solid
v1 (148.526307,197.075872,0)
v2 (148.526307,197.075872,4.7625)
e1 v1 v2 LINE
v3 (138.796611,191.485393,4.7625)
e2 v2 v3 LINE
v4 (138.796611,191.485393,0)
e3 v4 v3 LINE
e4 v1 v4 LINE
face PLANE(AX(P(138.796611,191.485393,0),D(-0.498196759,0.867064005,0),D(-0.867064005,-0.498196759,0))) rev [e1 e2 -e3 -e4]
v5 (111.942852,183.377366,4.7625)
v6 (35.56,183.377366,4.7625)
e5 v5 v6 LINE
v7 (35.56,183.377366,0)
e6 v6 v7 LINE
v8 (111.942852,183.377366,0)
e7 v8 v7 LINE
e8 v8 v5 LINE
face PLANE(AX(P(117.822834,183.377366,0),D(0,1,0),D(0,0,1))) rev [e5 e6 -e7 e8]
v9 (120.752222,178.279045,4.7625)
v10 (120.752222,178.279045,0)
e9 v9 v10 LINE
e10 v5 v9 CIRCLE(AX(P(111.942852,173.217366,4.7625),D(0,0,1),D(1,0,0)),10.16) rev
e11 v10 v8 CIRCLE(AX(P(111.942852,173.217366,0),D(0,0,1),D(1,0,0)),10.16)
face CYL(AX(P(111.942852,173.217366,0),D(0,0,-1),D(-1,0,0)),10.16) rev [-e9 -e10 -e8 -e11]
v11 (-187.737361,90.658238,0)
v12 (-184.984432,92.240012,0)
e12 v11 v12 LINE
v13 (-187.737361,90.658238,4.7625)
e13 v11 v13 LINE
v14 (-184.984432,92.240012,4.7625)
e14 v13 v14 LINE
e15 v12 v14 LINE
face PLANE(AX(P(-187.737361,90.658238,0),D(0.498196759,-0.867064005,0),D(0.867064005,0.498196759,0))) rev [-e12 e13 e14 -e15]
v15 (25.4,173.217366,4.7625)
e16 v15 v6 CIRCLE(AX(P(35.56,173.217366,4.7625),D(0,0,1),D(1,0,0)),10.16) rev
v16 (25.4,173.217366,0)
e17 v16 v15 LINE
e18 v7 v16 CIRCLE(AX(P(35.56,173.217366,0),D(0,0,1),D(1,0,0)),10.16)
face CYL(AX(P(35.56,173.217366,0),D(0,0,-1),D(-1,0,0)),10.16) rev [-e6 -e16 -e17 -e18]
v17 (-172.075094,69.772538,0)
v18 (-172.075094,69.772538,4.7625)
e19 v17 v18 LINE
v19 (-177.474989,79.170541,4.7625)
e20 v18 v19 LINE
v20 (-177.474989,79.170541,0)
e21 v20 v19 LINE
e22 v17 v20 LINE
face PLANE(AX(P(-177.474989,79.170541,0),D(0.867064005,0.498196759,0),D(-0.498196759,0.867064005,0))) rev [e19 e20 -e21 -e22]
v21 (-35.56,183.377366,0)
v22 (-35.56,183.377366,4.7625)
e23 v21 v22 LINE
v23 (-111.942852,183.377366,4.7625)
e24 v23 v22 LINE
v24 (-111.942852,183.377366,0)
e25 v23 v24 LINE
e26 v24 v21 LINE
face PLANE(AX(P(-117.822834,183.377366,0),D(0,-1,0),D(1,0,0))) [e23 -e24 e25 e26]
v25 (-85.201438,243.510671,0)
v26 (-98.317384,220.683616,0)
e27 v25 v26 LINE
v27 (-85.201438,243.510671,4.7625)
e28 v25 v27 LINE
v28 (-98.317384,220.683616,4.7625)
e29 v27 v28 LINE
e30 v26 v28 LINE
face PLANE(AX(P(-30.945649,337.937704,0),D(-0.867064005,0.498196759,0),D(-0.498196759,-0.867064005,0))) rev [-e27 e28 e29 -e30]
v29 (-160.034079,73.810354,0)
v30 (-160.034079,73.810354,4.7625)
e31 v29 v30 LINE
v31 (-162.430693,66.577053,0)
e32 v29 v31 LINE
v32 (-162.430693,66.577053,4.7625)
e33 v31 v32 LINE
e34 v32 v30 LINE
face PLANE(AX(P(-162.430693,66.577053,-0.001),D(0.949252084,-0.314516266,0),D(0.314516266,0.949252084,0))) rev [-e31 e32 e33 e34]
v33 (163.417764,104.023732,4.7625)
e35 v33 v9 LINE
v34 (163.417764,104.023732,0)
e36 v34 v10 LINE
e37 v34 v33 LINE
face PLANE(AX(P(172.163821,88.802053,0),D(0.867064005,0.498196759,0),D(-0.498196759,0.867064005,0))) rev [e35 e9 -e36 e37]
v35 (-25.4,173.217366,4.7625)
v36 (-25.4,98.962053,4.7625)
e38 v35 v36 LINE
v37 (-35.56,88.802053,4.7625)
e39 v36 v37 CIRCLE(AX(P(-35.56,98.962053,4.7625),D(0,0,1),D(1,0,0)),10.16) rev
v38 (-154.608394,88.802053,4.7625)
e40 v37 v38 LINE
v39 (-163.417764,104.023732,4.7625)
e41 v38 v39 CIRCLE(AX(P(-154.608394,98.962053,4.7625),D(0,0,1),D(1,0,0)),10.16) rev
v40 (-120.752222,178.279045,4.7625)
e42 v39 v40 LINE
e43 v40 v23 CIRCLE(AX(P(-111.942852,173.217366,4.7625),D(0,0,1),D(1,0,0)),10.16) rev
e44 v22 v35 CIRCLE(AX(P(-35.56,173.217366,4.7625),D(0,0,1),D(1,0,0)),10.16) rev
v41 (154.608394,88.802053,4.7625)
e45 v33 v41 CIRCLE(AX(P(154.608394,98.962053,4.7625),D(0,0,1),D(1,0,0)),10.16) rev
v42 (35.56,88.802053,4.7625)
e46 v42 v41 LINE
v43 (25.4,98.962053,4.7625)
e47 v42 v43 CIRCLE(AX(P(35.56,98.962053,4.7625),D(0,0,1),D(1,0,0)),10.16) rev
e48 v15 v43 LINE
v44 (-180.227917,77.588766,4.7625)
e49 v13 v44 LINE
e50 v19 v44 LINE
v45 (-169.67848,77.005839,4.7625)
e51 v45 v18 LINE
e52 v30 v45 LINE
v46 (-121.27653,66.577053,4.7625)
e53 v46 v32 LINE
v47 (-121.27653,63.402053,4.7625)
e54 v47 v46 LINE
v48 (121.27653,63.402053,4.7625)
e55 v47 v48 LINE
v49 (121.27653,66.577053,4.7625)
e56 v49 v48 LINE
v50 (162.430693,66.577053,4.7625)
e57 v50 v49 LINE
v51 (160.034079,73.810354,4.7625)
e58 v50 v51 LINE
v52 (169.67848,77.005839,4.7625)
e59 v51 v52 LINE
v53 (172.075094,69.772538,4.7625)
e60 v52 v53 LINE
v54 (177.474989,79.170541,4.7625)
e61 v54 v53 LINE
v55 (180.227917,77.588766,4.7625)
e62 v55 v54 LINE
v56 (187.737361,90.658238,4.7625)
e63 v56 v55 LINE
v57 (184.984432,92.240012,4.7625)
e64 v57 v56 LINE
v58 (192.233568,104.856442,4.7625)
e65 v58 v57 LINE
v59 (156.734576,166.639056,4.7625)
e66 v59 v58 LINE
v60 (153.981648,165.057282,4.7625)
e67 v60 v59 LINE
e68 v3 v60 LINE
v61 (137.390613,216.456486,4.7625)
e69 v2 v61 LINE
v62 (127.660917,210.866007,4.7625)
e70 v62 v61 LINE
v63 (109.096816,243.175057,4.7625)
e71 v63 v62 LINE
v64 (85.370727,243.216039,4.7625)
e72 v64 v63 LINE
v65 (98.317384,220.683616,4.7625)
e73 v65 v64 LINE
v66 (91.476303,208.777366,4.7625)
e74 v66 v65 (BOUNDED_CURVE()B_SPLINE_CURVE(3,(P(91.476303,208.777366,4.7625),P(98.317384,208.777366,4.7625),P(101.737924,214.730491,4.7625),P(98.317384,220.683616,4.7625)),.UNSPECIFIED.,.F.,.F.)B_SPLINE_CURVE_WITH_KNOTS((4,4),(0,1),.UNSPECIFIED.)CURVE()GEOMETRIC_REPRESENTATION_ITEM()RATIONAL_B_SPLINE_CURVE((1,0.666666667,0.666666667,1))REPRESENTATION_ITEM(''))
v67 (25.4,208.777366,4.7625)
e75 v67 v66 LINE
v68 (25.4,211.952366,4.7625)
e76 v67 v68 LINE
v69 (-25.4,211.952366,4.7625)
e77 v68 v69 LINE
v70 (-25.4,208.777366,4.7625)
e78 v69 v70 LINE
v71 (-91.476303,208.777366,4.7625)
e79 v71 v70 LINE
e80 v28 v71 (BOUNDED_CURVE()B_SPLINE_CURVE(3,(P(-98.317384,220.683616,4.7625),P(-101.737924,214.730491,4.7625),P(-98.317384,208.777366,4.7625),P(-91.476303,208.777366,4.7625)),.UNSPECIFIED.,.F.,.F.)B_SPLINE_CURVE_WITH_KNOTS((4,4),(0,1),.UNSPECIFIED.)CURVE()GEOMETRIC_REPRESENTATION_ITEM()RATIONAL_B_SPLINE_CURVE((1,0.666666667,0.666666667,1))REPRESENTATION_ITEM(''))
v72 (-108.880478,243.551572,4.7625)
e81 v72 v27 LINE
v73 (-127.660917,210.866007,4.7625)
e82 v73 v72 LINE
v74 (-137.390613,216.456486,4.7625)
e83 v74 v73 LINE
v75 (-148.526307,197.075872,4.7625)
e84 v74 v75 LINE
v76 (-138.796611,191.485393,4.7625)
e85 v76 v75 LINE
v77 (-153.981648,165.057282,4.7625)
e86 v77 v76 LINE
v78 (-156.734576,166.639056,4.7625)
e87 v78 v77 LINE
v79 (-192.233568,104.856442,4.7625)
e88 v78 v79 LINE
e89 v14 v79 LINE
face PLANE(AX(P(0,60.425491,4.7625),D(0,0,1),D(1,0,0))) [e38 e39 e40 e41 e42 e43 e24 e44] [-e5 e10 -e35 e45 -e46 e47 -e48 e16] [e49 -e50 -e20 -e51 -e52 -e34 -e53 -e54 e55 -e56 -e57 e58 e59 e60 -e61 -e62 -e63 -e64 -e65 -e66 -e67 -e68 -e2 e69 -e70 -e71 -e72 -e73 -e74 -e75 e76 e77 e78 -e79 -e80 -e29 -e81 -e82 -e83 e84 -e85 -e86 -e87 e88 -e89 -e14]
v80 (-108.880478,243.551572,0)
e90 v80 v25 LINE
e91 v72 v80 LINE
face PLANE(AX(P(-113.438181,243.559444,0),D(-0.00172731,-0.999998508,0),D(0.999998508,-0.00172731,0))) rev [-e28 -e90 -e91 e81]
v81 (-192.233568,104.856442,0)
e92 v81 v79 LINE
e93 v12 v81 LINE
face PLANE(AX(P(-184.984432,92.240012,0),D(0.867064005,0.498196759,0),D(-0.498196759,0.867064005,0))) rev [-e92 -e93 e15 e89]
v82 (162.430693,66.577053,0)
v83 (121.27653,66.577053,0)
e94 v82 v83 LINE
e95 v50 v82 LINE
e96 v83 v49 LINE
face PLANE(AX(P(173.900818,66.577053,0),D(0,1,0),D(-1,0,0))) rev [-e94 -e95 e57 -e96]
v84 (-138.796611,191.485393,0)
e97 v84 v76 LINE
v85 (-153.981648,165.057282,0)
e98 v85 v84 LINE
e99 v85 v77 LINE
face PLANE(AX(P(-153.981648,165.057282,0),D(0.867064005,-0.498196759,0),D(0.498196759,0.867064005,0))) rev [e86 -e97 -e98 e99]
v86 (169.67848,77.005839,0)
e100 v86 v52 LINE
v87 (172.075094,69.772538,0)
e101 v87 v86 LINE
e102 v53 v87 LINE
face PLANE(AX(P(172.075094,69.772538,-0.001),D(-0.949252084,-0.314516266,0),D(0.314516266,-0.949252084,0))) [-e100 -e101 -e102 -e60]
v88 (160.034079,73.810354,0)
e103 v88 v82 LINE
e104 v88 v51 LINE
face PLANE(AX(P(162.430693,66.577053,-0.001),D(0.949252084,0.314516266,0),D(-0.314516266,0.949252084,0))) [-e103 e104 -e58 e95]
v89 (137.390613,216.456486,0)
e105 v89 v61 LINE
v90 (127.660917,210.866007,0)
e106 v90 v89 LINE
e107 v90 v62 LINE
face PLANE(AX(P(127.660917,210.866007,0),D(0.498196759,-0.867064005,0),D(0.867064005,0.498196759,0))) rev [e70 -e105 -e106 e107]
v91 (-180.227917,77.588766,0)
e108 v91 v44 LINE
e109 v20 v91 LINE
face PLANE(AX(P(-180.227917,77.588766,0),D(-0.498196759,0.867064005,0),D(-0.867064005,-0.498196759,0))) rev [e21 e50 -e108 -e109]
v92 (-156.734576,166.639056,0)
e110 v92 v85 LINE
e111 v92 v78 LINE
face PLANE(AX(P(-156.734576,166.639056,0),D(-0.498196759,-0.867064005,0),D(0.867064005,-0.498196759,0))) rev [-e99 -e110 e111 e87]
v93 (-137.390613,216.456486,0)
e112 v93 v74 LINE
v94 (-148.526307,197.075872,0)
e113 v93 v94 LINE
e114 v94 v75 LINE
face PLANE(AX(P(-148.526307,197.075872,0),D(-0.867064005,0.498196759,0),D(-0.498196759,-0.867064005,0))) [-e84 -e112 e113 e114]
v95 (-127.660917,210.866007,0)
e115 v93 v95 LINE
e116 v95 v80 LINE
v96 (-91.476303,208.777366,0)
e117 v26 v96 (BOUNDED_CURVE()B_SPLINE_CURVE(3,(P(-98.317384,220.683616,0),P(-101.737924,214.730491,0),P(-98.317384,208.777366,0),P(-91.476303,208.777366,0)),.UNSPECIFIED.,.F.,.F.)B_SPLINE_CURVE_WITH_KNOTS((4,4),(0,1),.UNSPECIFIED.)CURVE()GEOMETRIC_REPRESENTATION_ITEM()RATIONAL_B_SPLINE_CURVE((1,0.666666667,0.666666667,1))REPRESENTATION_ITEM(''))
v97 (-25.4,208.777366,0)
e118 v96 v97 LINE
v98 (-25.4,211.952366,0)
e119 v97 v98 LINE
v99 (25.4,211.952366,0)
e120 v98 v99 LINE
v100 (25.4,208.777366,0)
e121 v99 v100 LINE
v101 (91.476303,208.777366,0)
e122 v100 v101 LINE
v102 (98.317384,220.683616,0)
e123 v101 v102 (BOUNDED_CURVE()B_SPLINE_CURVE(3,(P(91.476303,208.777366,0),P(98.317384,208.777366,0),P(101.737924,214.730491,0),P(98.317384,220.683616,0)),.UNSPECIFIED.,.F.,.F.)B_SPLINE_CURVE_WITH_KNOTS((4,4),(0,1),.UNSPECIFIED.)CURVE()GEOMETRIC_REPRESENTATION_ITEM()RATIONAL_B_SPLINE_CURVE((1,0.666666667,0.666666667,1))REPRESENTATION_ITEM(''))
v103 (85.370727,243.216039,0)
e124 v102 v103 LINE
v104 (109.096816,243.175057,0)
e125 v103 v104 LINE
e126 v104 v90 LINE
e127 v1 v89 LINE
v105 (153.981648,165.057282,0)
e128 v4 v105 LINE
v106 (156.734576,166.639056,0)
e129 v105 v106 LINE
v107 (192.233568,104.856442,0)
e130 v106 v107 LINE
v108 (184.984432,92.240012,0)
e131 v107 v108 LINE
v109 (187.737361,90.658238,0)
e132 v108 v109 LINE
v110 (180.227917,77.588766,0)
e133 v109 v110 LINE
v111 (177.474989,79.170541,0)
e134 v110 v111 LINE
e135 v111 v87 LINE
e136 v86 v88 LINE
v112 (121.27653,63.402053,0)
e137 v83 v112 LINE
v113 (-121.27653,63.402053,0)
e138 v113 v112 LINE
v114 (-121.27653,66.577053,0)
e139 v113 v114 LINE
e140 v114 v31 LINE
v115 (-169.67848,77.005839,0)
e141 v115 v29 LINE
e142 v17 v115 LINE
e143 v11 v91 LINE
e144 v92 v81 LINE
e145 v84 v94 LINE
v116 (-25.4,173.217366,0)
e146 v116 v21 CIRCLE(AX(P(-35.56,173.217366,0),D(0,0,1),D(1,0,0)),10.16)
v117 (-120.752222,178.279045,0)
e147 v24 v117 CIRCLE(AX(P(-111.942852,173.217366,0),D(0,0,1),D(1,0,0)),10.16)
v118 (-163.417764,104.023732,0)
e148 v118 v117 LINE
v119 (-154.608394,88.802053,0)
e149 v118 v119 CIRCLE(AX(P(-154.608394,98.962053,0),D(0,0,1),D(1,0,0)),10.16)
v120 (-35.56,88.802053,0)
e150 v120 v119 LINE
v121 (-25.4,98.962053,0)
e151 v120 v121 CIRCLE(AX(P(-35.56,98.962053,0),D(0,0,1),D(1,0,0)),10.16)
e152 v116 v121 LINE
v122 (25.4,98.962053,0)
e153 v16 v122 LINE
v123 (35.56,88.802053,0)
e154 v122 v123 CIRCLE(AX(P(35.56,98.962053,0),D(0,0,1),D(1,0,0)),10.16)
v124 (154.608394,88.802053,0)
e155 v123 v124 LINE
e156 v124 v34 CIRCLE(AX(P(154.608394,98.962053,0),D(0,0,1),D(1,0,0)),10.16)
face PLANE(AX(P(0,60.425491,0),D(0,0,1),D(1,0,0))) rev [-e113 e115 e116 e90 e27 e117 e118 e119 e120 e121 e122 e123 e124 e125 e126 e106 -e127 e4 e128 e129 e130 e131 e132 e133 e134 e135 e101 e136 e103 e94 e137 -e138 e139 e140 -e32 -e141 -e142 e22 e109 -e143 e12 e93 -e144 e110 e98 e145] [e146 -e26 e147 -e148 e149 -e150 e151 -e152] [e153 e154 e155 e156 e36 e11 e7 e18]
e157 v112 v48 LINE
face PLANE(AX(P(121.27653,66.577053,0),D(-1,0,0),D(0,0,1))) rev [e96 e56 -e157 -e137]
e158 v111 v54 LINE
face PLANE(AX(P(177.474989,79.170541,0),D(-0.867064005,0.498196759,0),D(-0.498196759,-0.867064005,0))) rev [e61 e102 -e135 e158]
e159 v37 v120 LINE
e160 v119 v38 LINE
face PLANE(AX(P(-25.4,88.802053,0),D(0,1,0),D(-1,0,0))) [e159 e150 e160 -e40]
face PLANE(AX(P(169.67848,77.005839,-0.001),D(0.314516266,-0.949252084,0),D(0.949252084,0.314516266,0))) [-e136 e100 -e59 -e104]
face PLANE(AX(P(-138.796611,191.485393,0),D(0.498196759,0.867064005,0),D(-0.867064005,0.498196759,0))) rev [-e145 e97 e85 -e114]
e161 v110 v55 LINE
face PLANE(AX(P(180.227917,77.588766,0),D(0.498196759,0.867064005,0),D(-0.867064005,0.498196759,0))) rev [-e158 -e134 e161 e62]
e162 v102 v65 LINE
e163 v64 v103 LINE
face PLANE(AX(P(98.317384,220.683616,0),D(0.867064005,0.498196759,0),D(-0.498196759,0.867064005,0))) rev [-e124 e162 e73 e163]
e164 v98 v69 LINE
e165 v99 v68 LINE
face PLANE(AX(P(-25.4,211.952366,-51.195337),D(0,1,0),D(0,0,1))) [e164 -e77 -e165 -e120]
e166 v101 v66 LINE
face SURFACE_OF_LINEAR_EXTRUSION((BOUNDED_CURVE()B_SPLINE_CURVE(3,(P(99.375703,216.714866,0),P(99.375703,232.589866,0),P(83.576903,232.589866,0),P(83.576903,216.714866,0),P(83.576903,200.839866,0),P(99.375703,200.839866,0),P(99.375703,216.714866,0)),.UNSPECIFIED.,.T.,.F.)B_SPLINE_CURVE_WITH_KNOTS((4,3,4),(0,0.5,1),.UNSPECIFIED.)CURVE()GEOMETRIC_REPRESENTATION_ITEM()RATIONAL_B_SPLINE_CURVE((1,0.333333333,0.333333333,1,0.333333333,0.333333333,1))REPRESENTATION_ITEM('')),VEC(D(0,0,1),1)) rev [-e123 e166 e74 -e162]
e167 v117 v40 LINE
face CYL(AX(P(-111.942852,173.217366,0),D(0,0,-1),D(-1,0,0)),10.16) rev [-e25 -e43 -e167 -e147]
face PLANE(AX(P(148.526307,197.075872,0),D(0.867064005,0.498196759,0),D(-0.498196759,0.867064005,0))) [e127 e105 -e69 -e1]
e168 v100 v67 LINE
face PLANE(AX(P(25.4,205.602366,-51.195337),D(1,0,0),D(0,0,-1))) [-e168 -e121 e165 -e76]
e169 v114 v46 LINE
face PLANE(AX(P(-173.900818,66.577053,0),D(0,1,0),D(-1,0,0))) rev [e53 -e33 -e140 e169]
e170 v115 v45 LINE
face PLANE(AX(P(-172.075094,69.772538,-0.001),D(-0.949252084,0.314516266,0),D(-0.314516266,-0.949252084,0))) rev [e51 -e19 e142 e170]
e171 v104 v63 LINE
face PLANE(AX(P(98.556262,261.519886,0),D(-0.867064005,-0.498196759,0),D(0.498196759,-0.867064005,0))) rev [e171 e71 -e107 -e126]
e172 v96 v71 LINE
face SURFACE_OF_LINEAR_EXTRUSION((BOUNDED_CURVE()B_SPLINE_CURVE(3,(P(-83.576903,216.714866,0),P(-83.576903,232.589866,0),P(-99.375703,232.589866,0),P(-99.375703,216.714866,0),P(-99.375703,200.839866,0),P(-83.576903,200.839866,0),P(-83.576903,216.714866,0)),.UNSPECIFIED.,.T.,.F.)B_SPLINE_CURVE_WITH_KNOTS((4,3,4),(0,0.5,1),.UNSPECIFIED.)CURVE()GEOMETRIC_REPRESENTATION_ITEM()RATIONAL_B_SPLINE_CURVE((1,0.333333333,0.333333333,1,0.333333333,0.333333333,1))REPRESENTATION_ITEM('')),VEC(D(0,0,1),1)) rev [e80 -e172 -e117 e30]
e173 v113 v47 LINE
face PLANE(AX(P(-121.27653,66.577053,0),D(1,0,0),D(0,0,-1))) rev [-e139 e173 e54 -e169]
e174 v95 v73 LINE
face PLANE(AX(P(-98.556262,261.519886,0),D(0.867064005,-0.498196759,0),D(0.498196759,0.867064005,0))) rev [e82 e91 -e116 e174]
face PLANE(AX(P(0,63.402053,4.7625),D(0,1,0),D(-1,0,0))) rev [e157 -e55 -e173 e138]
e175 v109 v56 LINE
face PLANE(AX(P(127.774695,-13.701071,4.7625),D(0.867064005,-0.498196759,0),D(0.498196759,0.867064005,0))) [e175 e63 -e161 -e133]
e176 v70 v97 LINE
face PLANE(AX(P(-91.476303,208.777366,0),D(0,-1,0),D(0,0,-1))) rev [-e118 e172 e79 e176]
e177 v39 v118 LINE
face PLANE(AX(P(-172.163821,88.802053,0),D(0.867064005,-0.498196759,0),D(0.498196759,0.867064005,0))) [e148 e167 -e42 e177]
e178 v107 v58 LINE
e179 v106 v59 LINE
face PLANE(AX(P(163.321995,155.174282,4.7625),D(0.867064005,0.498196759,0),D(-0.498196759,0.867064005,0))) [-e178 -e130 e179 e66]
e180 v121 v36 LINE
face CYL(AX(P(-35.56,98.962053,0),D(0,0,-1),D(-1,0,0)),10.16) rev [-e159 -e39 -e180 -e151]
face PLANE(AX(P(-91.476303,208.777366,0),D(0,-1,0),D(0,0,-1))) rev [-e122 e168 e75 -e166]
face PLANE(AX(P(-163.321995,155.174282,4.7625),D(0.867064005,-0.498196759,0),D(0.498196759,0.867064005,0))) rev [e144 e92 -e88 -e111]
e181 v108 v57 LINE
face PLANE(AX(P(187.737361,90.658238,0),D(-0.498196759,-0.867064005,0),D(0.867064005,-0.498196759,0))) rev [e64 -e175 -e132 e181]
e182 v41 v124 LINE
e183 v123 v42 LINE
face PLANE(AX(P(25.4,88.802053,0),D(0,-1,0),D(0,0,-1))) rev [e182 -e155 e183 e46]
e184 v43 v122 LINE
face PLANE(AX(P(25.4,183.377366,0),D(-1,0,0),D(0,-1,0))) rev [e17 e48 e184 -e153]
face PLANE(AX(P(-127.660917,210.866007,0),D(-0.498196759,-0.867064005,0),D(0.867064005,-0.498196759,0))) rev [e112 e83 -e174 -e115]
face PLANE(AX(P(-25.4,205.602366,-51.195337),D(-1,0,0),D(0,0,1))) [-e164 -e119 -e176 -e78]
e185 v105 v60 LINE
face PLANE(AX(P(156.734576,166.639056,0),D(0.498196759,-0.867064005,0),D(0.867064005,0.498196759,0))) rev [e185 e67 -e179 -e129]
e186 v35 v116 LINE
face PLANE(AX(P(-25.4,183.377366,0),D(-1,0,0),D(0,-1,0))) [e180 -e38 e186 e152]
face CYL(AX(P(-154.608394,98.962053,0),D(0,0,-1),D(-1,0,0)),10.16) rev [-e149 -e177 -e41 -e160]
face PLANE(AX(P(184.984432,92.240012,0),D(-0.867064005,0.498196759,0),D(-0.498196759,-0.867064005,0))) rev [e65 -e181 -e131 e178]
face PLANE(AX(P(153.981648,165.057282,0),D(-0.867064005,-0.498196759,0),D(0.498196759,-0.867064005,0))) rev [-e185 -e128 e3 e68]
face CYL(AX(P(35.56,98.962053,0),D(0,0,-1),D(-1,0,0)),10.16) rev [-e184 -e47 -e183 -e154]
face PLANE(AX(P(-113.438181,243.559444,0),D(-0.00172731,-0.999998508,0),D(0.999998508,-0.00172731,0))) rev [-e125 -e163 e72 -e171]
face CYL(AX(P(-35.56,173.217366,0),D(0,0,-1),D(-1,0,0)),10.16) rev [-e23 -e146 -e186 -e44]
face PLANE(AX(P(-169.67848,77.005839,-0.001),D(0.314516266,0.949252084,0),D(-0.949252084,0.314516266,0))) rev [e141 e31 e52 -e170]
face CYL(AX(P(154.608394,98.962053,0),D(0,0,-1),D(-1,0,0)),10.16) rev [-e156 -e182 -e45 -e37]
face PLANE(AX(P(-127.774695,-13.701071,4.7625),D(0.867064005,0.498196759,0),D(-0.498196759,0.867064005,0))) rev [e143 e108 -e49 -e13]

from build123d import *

# Parameters (mm, degrees)
BOSS_EXTRUDE1_DEPTH = 4.7625
CUT_EXTRUDE5_DEPTH  = 591.371112999
SCALE1_SCALE_X      = 0.622
SCALE1_SCALE_Y      = 0.625
SCALE1_SCALE_Z      = 1
CUT_EXTRUDE8_DEPTH  = 422.073439333
FILLET1_R           = 10.16
CUT_EXTRUDE9_DEPTH  = 422.073439333
BOSS_EXTRUDE2_DEPTH = 4.7625
CUT_EXTRUDE10_DEPTH = 422.073439333
CUT_EXTRUDE11_DEPTH = 422.073439333
SKETCH16_W          = 50.8
SKETCH16_H          = 6.35
BOSS_EXTRUDE3_DEPTH = 4.7625
CUT_EXTRUDE12_START = -4.7625
CUT_EXTRUDE12_DEPTH = 4.7625
CUT_EXTRUDE13_DEPTH = 421.232758824


# Read off the part's stored shape, not the designer's step: Cut-Extrude12
with BuildPart() as part:
    # Sketch3 → Boss-Extrude1 (new body)
    with BuildSketch(Plane.XY):
        Polygon((312.000738686, 65.991135768), (166.792028218, 317.5), (-166.792028218, 317.5), (-312.000738686, 65.991135768), (-276.650369343, 4.7625), (276.650369343, 4.7625), align=None)
        Polygon((-166.792028218, 317.5), (166.792028218, 317.5), (60.750369343, 501.169540891), (-60.750369343, 501.169540891), align=None)
    extrude(amount=BOSS_EXTRUDE1_DEPTH)

    # Sketch7 → Cut-Extrude5 (cut, through all)
    with BuildSketch(Plane.XY.offset(4.7625)):
        with BuildLine():
            Line((-147.068010972, 237.363), (147.068010972, 237.363))
            ThreePointArc((147.068010972, 237.363), (158.0665336, 243.713), (158.0665336, 256.413))
            Line((158.0665336, 256.413), (49.751846715, 444.019540891))
            ThreePointArc((49.751846715, 444.019540891), (45.103324087, 448.668063519), (38.753324087, 450.369540891))
            Line((38.753324087, 450.369540891), (-38.753324087, 450.369540891))
            ThreePointArc((-38.753324087, 450.369540891), (-45.103324087, 448.668063519), (-49.751846715, 444.019540891))
            Line((-49.751846715, 444.019540891), (-158.0665336, 256.413))
            ThreePointArc((-158.0665336, 256.413), (-158.0665336, 243.713), (-147.068010972, 237.363))
        make_face()
    extrude(amount=-CUT_EXTRUDE5_DEPTH, mode=Mode.SUBTRACT)


with BuildPart() as part_1:
    # Scale1: scaled about (0, 161.134641619, 2.38125)
    add(part.part.scale((SCALE1_SCALE_X, SCALE1_SCALE_Y, SCALE1_SCALE_Z), about=(0, 161.134641619, 2.38125)))

    # Sketch11 → Cut-Extrude8 (cut, through all)
    with BuildSketch(Plane.XY.offset(4.7625)):
        Polygon((25.4, 183.377365607), (25.4, 88.802053107), (172.163821071, 88.802053107), (117.822833735, 183.377365607), align=None)
        Polygon((-117.822833735, 183.377365607), (-25.4, 183.377365607), (-25.4, 88.802053107), (-172.163821071, 88.802053107), align=None)
    extrude(amount=-CUT_EXTRUDE8_DEPTH, mode=Mode.SUBTRACT)

    # Fillet1
    fillet1_edges = [part_1.edges().sort_by_distance(p)[0] for p in [
        (-172.163821071, 88.802053107, 2.38125),
        (-117.822833735, 183.377365607, 2.38125),
        (-25.4, 183.377365607, 2.38125),
        (-25.4, 88.802053107, 2.38125),
        (117.822833735, 183.377365607, 2.38125),
        (172.163821071, 88.802053107, 2.38125),
        (25.4, 88.802053107, 2.38125),
        (25.4, 183.377365607, 2.38125),
    ]]
    fillet(fillet1_edges, radius=FILLET1_R)

    # Sketch12 → Cut-Extrude9 (cut, through all)
    with BuildSketch(Plane.XY.offset(4.7625)):
        Polygon((141.549539127, 193.067167281), (156.734576332, 166.639056393), (153.981648115, 165.057281684), (138.796610909, 191.485392572), align=None)
        Polygon((101.309190532, 263.101661132), (98.556262314, 261.519886423), (127.660916958, 210.866007222), (130.413845176, 212.447781931), align=None)
        Polygon((-153.981648115, 165.057281684), (-138.796610909, 191.485392572), (-141.549539127, 193.067167281), (-156.734576332, 166.639056393), align=None)
        Polygon((-127.660916958, 210.866007222), (-130.413845176, 212.447781931), (-101.309190532, 263.101661132), (-98.556262314, 261.519886423), align=None)
    extrude(amount=-CUT_EXTRUDE9_DEPTH, mode=Mode.SUBTRACT)

    # Sketch13 → Boss-Extrude2 (add)
    with BuildSketch(Plane.XY.offset(4.7625)):
        Polygon((130.413845176, 212.447781931), (141.549539127, 193.067167281), (148.526307077, 197.075871548), (137.390613126, 216.456486199), align=None)
        Polygon((-148.526307077, 197.075871548), (-137.390613126, 216.456486199), (-130.413845176, 212.447781931), (-141.549539127, 193.067167281), align=None)
    extrude(amount=-BOSS_EXTRUDE2_DEPTH)

    # Sketch14 → Cut-Extrude10 (cut, through all)
    with BuildSketch(Plane.XY.offset(4.7625)):
        Polygon((172.076529731, 63.402053107), (173.900818018, 66.577053107), (121.276529731, 66.577053107), (121.276529731, 63.402053107), align=None)
        Polygon((-121.276529731, 66.577053107), (-121.276529731, 63.402053107), (-172.076529731, 63.402053107), (-173.900818018, 66.577053107), align=None)
    extrude(amount=-CUT_EXTRUDE10_DEPTH, mode=Mode.SUBTRACT)

    # Sketch15 → Cut-Extrude11 (cut, through all)
    with BuildSketch(Plane.XY.offset(4.7625)):
        Polygon((194.064459463, 101.669950462), (192.233568098, 104.85644249), (184.98443241, 92.240012302), (187.737360627, 90.658237593), align=None)
        Polygon((173.900818018, 66.577053107), (180.227916854, 77.588765977), (177.474988636, 79.170540686), (170.239035289, 66.577053107), align=None)
        Polygon((-177.474988636, 79.170540686), (-170.239035289, 66.577053107), (-173.900818018, 66.577053107), (-180.227916854, 77.588765977), align=None)
        Polygon((-187.737360627, 90.658237593), (-184.98443241, 92.240012302), (-192.233568098, 104.85644249), (-194.064459463, 101.669950462), align=None)
    extrude(amount=-CUT_EXTRUDE11_DEPTH, mode=Mode.SUBTRACT)

    # Sketch16 → Boss-Extrude3 (add)
    with BuildSketch(Plane.XY.offset(4.7625)):
        with Locations((0, 208.777365607)):
            Rectangle(SKETCH16_W, SKETCH16_H)
    extrude(amount=-BOSS_EXTRUDE3_DEPTH)

    # Cut-Extrude12 outline → Cut-Extrude12 (cut)
    with BuildSketch(Plane.XY.offset(4.7625).offset(CUT_EXTRUDE12_START)):
        Polygon((-160.03407886, 73.810353985), (-169.67848003, 77.005839249), (-172.075093978, 69.772538371), (-170.239035289, 66.577053107), (-162.430692808, 66.577053107), align=None)
    cut_extrude12 = extrude(amount=CUT_EXTRUDE12_DEPTH, mode=Mode.SUBTRACT)

    # Mirror1: Cut-Extrude12 across plane
    add(cut_extrude12.mirror(Plane(origin=(0, 0, 0), x_dir=(0, 0, 1), z_dir=(1, 0, 0))), mode=Mode.SUBTRACT)

    # Sketch18 → Cut-Extrude13 (cut, through all)
    with BuildSketch(Plane.XY.offset(4.7625)):
        Polygon((-37.786729731, 373.656453664), (37.786729731, 373.656453664), (112.762236491, 243.168725538), (-113.438180507, 243.559444472), align=None)
    extrude(amount=-CUT_EXTRUDE13_DEPTH, mode=Mode.SUBTRACT)


solid = part_1.part
